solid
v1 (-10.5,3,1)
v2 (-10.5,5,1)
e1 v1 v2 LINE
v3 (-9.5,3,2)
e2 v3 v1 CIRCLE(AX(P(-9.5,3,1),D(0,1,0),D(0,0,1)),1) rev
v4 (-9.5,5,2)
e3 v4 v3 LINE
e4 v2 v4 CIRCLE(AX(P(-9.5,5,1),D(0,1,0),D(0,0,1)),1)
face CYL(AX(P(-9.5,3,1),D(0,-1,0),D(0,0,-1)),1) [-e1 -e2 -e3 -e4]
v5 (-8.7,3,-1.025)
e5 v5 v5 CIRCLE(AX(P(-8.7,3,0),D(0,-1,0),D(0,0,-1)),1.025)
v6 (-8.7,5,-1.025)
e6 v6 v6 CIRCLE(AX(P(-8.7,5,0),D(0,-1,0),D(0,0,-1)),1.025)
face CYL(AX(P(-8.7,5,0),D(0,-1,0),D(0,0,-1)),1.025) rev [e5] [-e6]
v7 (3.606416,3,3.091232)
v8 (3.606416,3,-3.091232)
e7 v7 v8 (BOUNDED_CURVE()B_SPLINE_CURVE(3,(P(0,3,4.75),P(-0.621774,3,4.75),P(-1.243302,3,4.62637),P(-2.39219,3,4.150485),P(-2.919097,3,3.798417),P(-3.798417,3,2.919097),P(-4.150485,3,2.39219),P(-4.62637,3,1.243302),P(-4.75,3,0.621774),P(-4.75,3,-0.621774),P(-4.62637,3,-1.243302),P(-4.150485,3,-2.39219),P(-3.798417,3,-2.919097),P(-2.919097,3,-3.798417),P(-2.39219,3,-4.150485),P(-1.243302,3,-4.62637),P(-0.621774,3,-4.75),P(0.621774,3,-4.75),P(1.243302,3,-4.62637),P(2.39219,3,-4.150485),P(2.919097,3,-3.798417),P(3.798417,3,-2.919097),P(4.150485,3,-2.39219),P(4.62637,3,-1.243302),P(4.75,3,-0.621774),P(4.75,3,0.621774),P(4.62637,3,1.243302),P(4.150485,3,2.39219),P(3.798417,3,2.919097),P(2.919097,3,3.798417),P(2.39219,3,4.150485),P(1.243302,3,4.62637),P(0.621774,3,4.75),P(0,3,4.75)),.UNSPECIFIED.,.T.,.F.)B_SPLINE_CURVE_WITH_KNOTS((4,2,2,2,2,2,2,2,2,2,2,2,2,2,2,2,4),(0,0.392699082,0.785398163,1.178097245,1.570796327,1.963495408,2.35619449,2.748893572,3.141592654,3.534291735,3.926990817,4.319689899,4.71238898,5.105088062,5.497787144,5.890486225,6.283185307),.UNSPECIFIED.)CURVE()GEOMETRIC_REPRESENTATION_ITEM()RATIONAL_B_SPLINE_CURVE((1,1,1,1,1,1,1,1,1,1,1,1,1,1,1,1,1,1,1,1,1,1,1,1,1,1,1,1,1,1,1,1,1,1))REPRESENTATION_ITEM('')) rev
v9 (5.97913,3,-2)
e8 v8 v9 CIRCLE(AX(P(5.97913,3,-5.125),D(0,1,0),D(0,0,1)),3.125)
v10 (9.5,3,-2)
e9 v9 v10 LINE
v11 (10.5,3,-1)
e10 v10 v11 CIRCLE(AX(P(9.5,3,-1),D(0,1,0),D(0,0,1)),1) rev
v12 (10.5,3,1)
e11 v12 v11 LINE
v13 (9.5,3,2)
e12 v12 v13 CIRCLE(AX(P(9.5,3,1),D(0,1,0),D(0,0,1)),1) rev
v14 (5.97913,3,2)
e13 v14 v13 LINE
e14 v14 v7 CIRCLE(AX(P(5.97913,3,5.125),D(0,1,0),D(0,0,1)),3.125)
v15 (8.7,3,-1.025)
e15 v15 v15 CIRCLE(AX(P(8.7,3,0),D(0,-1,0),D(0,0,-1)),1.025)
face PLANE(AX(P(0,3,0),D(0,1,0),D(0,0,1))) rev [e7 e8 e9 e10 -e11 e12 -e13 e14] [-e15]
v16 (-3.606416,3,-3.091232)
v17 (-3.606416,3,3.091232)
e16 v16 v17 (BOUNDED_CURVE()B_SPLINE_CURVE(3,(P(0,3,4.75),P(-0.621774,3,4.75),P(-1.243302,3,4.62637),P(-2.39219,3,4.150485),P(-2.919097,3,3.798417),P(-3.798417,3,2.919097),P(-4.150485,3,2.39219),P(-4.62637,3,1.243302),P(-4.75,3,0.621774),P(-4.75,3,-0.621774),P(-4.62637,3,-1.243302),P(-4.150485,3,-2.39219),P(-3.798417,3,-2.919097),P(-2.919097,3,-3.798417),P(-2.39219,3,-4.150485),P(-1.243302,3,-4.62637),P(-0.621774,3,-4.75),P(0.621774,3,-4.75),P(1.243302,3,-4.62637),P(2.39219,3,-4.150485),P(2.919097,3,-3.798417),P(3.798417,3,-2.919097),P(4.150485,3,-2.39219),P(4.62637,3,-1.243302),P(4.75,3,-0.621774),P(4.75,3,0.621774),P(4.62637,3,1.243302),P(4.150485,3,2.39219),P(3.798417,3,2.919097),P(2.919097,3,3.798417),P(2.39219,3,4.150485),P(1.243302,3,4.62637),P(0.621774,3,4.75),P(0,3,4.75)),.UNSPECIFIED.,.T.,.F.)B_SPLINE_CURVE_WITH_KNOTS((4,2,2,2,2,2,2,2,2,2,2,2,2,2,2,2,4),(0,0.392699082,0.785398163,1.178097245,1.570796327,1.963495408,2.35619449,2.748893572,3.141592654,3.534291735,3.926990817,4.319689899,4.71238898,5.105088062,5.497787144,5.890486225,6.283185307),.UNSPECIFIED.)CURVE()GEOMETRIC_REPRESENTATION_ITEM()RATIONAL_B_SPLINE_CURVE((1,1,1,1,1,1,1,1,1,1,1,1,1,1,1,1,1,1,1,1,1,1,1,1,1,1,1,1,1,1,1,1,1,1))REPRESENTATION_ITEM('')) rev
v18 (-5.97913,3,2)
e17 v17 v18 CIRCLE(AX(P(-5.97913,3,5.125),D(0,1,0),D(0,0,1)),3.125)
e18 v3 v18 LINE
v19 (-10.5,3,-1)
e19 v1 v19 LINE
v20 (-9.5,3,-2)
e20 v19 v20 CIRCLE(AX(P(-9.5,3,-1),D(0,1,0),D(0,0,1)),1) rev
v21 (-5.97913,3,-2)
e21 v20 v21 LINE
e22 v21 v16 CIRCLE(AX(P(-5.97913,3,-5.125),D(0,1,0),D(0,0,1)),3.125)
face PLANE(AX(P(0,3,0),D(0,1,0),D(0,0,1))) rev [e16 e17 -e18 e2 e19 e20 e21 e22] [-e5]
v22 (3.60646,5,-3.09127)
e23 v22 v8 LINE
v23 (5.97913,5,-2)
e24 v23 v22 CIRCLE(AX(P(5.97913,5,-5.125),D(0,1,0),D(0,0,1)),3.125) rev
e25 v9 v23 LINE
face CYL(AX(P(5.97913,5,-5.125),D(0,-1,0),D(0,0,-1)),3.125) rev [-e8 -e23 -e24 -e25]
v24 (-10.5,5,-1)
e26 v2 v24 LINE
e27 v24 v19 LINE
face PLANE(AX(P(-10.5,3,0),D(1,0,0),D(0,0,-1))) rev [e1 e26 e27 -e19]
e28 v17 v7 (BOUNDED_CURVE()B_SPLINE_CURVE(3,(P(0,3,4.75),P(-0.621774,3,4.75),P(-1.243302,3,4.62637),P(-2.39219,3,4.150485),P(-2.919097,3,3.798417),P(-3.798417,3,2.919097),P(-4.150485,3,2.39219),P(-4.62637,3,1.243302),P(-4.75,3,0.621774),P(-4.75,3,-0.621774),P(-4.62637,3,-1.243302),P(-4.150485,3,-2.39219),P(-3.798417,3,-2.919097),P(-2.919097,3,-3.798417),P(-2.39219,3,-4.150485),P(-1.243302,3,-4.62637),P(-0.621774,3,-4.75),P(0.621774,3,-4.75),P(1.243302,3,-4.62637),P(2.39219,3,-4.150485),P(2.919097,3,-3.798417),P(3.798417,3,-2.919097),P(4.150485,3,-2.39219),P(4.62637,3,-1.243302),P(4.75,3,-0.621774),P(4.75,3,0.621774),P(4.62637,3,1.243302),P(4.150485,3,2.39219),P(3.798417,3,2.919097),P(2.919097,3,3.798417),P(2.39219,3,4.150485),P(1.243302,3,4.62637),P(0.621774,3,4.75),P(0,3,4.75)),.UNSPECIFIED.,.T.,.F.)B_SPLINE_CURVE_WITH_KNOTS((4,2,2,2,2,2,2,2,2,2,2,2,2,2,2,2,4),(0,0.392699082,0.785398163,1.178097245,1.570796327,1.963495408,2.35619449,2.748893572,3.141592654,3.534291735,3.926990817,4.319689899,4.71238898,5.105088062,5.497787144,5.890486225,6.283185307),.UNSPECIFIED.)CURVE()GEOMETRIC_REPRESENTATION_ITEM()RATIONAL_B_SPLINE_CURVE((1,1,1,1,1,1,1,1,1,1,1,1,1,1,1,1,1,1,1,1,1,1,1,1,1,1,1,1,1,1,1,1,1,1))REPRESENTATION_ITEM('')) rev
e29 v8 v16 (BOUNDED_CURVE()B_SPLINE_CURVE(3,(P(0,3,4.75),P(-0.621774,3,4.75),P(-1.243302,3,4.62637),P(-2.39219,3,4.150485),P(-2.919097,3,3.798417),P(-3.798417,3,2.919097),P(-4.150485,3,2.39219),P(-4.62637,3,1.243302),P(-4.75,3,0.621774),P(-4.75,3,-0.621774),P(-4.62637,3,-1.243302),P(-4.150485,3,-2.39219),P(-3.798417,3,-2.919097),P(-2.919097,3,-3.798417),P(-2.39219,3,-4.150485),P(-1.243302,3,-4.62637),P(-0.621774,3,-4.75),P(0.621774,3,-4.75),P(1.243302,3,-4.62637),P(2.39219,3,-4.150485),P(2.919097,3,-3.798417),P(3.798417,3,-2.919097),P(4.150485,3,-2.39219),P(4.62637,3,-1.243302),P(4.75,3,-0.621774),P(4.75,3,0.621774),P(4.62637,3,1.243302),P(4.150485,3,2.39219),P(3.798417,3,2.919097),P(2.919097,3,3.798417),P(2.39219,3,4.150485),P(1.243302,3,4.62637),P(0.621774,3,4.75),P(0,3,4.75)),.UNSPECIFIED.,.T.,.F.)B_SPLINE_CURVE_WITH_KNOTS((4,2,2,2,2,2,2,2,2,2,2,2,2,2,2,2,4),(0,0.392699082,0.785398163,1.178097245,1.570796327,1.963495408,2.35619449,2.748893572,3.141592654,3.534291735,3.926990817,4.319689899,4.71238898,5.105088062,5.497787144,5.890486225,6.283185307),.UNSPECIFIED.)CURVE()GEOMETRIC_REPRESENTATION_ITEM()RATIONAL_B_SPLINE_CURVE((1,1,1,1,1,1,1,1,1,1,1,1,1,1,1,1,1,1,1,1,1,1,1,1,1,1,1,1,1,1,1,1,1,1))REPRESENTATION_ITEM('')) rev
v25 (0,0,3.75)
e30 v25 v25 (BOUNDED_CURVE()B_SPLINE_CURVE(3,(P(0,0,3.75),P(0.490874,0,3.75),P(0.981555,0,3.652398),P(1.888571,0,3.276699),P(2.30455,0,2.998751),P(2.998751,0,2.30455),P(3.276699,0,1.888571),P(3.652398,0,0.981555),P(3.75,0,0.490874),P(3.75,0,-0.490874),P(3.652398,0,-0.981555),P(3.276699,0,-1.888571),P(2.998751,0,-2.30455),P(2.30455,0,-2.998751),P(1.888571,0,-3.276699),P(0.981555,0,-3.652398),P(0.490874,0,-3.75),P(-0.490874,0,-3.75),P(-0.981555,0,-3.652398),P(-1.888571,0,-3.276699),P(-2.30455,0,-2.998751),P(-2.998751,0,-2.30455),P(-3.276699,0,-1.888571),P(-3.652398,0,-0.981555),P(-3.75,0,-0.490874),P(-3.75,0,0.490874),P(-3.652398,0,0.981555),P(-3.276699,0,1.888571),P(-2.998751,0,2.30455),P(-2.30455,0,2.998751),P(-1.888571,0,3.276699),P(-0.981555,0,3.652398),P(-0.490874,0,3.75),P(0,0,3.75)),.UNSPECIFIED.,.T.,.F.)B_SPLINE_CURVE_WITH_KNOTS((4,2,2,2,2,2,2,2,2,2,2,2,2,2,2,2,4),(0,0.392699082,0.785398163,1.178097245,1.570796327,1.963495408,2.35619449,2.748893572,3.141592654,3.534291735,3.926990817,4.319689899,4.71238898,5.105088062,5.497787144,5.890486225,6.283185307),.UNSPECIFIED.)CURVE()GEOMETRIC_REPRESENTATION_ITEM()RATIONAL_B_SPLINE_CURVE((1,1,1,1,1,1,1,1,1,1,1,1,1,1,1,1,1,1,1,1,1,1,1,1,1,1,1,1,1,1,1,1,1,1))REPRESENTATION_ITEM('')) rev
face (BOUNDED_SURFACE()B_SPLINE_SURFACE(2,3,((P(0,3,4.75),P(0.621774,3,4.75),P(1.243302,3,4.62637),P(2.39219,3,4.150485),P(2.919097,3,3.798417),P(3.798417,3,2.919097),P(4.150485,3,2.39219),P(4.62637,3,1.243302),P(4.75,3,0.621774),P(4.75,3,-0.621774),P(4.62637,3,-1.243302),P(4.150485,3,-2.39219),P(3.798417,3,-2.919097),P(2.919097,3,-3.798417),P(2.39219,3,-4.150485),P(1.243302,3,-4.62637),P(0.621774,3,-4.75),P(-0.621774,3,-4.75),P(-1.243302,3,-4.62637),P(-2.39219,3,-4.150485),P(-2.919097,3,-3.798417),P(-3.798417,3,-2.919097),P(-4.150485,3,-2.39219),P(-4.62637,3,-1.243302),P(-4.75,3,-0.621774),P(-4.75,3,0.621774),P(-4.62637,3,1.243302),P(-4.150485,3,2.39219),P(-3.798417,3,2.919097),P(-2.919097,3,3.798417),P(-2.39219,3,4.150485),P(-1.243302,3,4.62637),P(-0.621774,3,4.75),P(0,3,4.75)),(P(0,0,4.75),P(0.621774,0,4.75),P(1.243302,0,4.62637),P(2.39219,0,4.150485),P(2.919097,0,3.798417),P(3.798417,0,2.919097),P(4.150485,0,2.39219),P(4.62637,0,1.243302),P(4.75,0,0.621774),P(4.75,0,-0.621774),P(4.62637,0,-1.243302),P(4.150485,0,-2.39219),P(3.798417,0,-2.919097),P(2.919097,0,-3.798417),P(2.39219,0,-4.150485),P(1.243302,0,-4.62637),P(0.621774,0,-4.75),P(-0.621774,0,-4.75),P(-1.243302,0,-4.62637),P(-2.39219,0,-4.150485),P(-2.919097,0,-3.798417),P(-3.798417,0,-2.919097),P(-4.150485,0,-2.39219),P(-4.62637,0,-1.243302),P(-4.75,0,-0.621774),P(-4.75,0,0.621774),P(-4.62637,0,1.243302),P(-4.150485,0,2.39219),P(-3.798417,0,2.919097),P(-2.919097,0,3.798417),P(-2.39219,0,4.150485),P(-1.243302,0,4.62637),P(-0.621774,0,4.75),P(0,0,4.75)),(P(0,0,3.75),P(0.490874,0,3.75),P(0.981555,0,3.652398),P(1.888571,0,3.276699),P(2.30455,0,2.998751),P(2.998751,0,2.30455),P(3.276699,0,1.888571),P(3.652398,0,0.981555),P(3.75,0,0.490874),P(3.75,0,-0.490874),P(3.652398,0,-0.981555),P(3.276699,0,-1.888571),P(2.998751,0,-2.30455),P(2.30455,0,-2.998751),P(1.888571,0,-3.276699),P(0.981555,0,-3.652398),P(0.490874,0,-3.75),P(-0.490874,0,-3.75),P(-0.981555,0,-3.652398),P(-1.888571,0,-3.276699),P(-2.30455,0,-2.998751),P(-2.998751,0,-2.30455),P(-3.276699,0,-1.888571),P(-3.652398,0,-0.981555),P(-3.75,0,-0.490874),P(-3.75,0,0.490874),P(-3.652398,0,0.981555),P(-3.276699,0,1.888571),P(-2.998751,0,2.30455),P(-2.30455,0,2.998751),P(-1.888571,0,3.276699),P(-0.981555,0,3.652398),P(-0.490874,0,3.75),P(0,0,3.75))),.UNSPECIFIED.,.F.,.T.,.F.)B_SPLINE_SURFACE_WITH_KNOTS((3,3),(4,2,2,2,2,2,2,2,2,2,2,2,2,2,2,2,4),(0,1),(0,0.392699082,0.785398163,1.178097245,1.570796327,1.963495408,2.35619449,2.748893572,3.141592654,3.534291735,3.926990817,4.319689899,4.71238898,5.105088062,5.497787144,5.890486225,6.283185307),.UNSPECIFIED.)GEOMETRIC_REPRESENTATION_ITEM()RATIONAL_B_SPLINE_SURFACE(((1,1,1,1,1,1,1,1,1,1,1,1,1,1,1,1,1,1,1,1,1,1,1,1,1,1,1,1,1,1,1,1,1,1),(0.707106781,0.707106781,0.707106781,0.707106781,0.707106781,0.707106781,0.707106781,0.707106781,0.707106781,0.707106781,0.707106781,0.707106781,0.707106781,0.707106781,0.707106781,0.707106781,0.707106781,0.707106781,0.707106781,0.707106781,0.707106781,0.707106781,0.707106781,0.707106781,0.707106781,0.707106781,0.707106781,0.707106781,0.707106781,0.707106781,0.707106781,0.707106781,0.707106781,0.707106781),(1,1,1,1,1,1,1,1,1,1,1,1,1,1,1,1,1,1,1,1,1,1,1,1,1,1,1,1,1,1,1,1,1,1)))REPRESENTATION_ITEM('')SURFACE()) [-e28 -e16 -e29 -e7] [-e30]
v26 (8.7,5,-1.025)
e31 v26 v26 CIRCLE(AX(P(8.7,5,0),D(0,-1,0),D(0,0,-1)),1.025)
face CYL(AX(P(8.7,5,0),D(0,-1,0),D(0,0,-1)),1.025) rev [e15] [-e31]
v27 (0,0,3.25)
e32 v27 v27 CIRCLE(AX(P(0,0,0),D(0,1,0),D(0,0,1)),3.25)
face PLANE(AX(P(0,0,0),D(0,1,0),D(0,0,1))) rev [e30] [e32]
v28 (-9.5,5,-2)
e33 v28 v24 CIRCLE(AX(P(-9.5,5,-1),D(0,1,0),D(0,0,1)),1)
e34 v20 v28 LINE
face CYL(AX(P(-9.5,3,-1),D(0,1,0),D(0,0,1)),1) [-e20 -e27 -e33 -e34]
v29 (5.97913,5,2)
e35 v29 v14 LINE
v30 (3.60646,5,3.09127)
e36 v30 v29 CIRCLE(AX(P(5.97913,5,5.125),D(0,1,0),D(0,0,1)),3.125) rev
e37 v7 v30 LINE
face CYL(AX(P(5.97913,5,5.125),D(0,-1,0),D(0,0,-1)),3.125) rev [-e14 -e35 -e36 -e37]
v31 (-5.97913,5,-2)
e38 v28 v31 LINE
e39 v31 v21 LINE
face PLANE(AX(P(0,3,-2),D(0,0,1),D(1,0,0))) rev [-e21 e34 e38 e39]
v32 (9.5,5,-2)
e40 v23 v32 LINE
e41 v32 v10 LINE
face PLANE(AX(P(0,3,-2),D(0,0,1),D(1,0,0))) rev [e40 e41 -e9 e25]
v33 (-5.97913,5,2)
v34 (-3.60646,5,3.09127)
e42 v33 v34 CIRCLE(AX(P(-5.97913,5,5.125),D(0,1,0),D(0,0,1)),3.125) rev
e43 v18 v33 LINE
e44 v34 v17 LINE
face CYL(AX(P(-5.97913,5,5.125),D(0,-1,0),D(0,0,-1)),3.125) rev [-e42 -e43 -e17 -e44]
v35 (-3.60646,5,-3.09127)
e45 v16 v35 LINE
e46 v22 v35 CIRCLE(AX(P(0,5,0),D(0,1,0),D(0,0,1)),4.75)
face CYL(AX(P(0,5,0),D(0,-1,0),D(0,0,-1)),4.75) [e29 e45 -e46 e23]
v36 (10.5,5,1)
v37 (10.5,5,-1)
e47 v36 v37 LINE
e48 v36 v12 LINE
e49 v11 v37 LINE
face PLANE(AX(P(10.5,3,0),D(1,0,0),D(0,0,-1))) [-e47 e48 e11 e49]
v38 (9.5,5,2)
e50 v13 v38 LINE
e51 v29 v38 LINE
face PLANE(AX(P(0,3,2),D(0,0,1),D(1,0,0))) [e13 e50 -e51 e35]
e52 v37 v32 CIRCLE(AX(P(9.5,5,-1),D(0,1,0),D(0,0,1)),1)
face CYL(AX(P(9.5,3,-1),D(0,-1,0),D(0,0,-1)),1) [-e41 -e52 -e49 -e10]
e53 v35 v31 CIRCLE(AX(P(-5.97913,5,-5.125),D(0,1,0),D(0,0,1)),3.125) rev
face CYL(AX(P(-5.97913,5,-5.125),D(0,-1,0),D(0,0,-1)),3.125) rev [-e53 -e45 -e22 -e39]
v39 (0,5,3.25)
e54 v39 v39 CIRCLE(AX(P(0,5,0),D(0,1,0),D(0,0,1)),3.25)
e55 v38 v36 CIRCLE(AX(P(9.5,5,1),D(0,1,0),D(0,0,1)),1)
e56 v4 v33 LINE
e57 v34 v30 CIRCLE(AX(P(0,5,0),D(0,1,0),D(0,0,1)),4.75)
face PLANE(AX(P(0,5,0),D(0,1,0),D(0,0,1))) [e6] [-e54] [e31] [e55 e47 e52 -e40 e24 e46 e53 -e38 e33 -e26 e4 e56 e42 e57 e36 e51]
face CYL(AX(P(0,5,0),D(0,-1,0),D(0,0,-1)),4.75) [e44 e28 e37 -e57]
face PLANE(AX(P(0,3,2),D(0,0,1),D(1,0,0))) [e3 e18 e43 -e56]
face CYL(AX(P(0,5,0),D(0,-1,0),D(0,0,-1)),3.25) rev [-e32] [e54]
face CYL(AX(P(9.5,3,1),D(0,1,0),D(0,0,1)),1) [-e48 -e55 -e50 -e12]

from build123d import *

# Parameters (mm, degrees)
SKETCH1_R           = 4.75
SKETCH1_R_2         = 3.25
BOSS_EXTRUDE1_DEPTH = 5
BOSS_EXTRUDE2_START = -2
BOSS_EXTRUDE2_DEPTH = 2
SKETCH3_R           = 1.025
CUT_EXTRUDE1_DEPTH  = 12.908505364
FILLET1_R           = 3.125
FILLET2_R           = 1
FILLET3_SIZE        = 3
FILLET3_SIZE_2      = 1


with BuildPart() as part:
    # Sketch1 → Boss-Extrude1 (new body)
    with BuildSketch(Plane(origin=(0, 0, 0), x_dir=(1, 0, 0), z_dir=(0, 1, 0))):
        with Locations(Location((0, 0, 0), (0, 0, 270))):
            Circle(SKETCH1_R)
        with Locations(Location((0, 0, 0), (0, 0, 270))):
            Circle(SKETCH1_R_2, mode=Mode.SUBTRACT)
    extrude(amount=BOSS_EXTRUDE1_DEPTH)

    # Sketch2 → Boss-Extrude2 (add)
    with BuildSketch(Plane(origin=(0, 5, 0), x_dir=(1, 0, 0), z_dir=(0, 1, 0)).offset(BOSS_EXTRUDE2_START)):
        with BuildLine():
            ThreePointArc((4.75, 0), (4.63829195, -1.024083876), (4.308421985, -2))
            Line((4.308421985, -2), (10.5, -2))
            Line((10.5, -2), (10.5, 2))
            Line((10.5, 2), (4.308421985, 2))
            ThreePointArc((4.308421985, 2), (4.63829195, 1.024083876), (4.75, 0))
        make_face()
        with BuildLine():
            Line((-10.5, -2), (-4.308421985, -2))
            ThreePointArc((-4.308421985, -2), (-4.75, 0), (-4.308421985, 2))
            Line((-4.308421985, 2), (-10.5, 2))
            Line((-10.5, 2), (-10.5, -2))
        make_face()
    extrude(amount=BOSS_EXTRUDE2_DEPTH)

    # Sketch3 → Cut-Extrude1 (cut, through all)
    with BuildSketch(Plane.XZ.offset(-3)):
        with Locations(Location((8.7, 0, 0), (0, 0, 270))):
            Circle(SKETCH3_R)
        with Locations(Location((-8.7, 0, 0), (0, 0, 270))):
            Circle(SKETCH3_R)
    extrude(amount=-CUT_EXTRUDE1_DEPTH, mode=Mode.SUBTRACT)

    # Fillet1
    fillet1_edges = [part.edges().sort_by_distance(p)[0] for p in [
        (4.308421985, 4, 2),
        (4.308421985, 4, -2),
        (-4.308421985, 4, -2),
        (-4.308421985, 4, 2),
    ]]
    fillet(fillet1_edges, radius=FILLET1_R)

    # Fillet2
    fillet2_edges = [part.edges().sort_by_distance(p)[0] for p in [
        (10.5, 4, 2),
        (10.5, 4, -2),
        (-10.5, 4, -2),
        (-10.5, 4, 2),
    ]]
    fillet(fillet2_edges, radius=FILLET2_R)

    # Fillet3
    # an asymmetric fillet: 3, 1 mm, written as the material it takes off along each edge
    with BuildSketch(Plane(origin=(0, 0, 0), x_dir=(0, 0, 1), z_dir=(-1, 0, 0))) as fillet3_piece_1:
        with BuildLine():
            Bezier((4.75, FILLET3_SIZE), (4.75, 0), (4.75 - FILLET3_SIZE_2, 0), weights=[1, 0.707106781, 1])
            Line((4.75 - FILLET3_SIZE_2, 0), (4.75, 0))
            Line((4.75, 0), (4.75, FILLET3_SIZE))
        make_face()
    revolve(axis=Axis((0, 0, 0), (0, 1, 0)), mode=Mode.SUBTRACT)


solid = part.part
